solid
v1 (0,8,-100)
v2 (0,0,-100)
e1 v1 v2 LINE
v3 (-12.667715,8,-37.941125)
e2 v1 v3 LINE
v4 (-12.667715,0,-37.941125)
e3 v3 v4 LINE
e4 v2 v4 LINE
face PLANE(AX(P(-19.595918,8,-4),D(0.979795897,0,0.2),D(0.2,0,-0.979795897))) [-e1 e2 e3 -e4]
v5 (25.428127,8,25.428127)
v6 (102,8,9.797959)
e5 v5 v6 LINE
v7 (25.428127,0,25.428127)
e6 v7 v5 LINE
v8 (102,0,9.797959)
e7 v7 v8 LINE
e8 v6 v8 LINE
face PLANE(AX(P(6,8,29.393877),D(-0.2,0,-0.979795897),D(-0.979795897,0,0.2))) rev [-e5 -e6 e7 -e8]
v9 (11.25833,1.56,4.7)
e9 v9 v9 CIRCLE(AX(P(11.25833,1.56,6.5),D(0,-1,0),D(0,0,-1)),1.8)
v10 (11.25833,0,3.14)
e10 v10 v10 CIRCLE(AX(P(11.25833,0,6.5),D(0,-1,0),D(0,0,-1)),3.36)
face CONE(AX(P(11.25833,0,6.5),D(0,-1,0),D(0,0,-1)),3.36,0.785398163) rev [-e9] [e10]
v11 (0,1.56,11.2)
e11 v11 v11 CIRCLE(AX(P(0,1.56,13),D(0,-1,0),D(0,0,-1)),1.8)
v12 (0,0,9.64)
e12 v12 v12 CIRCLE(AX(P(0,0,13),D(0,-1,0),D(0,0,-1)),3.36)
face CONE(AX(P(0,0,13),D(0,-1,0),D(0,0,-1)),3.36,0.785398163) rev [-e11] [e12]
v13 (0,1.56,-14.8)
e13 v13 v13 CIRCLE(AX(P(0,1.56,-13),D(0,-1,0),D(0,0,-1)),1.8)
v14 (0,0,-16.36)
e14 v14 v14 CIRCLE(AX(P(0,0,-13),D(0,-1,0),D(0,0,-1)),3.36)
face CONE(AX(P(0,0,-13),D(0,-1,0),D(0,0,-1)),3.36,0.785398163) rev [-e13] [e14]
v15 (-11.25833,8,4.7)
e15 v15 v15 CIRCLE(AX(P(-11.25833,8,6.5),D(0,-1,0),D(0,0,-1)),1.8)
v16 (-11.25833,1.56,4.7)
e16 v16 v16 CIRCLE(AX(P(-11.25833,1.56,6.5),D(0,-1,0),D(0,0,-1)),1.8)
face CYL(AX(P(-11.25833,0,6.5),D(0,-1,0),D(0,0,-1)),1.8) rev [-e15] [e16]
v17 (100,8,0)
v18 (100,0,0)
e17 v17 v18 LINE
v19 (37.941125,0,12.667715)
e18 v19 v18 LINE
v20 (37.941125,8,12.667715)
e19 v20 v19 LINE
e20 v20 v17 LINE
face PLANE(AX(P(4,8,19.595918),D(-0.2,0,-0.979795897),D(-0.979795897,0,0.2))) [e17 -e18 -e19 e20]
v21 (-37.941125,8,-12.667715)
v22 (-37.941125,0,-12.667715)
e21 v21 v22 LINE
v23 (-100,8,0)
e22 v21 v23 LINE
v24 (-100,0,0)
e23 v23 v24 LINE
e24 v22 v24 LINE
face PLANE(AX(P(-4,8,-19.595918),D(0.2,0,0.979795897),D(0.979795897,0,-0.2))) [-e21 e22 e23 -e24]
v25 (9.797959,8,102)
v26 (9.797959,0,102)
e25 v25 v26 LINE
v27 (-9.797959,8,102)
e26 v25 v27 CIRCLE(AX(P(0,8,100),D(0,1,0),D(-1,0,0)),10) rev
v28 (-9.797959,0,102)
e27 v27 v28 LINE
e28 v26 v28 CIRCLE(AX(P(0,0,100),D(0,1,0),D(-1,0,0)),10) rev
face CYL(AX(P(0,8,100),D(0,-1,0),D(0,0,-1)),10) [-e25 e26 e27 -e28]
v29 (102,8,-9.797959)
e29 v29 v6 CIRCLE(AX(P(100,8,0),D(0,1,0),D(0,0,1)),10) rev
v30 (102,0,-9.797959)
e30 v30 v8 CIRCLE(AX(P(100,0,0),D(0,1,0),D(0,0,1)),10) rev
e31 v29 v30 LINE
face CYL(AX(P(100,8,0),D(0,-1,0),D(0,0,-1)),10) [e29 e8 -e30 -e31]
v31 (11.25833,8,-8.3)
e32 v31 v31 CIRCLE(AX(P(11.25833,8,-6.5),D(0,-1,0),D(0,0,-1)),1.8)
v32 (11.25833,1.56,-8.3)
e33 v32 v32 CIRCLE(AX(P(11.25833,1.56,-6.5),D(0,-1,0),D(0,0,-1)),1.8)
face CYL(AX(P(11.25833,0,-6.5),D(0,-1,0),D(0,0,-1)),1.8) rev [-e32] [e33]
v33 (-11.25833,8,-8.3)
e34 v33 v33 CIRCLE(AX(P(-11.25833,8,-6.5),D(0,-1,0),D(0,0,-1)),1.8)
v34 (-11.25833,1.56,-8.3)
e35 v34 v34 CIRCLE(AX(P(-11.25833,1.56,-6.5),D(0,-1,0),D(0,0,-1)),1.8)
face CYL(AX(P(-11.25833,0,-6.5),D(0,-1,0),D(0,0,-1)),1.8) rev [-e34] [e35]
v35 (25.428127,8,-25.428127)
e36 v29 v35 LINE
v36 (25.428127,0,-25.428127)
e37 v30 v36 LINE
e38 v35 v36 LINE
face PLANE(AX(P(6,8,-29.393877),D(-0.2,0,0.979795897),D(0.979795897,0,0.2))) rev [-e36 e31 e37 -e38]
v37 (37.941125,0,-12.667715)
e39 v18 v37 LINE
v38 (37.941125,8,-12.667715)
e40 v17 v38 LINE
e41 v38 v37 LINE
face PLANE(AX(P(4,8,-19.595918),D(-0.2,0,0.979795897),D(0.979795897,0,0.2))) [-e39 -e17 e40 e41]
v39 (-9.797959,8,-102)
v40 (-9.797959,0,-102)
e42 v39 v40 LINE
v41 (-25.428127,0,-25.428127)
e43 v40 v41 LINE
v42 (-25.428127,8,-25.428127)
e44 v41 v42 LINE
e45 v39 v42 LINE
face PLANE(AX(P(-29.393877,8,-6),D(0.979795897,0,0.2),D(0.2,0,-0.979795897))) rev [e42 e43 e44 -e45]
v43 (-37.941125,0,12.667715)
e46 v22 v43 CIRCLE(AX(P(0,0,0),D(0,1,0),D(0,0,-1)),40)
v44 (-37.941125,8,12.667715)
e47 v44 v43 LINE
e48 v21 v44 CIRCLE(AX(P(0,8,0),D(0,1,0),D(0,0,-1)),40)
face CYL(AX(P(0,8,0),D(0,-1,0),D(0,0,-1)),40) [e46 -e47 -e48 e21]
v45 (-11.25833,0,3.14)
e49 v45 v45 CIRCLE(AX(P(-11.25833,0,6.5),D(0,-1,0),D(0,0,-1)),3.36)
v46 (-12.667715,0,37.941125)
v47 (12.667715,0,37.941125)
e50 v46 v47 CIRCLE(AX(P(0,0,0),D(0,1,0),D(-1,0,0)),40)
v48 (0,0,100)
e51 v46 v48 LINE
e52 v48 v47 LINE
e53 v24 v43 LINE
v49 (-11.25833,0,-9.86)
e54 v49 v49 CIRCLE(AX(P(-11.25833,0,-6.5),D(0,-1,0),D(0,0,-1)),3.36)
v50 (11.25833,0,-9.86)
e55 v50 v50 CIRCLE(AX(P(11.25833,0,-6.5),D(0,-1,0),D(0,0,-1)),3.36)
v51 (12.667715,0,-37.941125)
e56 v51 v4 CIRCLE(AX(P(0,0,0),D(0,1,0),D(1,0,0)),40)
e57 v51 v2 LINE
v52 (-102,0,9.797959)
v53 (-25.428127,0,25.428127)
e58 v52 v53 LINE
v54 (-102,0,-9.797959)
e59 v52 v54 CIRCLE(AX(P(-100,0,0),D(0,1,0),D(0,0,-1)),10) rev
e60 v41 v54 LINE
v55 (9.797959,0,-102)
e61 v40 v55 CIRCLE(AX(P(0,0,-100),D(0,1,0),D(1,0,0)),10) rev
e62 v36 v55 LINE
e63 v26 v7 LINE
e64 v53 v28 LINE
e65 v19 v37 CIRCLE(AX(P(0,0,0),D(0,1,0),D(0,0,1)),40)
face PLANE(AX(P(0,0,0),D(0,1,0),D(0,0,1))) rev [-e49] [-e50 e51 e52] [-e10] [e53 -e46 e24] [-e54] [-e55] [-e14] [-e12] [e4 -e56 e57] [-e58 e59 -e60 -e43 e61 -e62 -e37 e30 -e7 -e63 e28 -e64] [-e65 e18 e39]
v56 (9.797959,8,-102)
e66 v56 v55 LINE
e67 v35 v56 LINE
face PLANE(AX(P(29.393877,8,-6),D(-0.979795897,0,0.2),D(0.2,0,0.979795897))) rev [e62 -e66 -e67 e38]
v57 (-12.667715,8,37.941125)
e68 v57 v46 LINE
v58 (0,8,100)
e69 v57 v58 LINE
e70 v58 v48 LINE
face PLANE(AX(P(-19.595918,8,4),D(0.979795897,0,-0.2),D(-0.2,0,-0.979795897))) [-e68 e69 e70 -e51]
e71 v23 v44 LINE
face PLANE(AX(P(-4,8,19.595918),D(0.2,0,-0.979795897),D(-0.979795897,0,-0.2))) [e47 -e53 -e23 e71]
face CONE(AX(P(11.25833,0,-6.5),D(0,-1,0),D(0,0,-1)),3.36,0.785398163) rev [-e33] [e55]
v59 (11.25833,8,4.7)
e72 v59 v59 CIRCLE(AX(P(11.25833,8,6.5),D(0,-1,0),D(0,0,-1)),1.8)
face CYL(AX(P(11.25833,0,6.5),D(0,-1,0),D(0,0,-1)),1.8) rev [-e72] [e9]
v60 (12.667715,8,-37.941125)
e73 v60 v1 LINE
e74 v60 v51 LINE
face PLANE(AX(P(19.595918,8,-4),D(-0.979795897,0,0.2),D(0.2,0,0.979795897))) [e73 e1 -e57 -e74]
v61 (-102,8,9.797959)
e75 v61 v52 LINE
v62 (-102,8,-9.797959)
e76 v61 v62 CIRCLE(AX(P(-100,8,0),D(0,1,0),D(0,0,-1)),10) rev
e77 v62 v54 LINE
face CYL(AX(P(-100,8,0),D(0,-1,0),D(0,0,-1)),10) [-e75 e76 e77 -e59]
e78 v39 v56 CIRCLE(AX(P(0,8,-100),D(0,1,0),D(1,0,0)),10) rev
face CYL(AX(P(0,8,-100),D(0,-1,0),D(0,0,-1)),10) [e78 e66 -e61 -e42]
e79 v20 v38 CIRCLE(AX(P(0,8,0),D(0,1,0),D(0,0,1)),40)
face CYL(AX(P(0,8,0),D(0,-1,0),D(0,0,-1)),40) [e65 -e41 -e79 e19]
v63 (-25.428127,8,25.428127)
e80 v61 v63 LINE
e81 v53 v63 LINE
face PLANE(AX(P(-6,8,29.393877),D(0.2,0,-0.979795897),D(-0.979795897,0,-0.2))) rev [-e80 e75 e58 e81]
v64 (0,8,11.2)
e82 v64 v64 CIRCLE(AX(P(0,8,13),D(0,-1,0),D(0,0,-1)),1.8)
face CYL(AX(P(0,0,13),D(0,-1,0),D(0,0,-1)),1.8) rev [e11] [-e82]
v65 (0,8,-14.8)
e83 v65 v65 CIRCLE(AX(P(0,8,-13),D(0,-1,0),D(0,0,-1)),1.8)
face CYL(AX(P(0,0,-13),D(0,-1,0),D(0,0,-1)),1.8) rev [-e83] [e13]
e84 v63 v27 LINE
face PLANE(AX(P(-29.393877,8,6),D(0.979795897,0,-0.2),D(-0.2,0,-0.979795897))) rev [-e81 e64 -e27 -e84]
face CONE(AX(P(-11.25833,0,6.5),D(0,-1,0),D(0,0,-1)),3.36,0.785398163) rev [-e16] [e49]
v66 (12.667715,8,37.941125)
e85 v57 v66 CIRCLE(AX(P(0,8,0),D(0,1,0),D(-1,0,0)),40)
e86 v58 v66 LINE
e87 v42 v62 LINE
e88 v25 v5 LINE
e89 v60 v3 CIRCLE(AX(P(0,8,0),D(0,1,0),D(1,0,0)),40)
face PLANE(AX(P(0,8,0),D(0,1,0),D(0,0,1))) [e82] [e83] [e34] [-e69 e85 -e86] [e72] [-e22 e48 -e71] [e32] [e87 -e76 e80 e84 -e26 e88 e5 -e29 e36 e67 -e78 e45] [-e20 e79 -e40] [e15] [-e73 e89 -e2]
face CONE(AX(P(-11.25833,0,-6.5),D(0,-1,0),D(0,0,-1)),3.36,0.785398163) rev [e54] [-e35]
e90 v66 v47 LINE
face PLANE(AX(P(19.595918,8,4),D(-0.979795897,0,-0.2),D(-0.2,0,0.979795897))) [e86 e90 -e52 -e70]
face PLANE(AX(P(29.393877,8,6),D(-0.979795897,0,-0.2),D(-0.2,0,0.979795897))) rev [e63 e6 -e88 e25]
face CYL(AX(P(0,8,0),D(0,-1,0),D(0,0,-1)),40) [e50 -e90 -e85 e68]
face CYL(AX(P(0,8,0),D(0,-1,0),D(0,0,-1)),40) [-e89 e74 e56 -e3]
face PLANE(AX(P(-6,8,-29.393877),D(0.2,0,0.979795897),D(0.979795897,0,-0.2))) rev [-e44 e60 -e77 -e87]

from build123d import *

# Parameters (mm, degrees)
BOSS_EXTRUDE1_DEPTH = 8
CIRPATTERN1_COUNT   = 4


# Read off the part's stored shape, not the designer's step: CSK for M3 Hex Socket Countersunk Cap Screw1
with BuildPart() as part:
    # Sketch2 → Boss-Extrude1 (new body)
    with BuildSketch(Plane(origin=(0, 0, 0), x_dir=(1, 0, 0), z_dir=(0, 1, 0))):
        with BuildLine():
            Line((6, -29.393876913), (102, -9.797958971))
            ThreePointArc((102, -9.797958971), (110, 0), (102, 9.797958971))
            Line((102, 9.797958971), (6, 29.393876913))
            ThreePointArc((6, 29.393876913), (-30, 0), (6, -29.393876913))
        make_face()
        with BuildLine():
            Line((37.941125497, -12.667714712), (100, 0))
            Line((100, 0), (37.941125497, 12.667714712))
            ThreePointArc((37.941125497, 12.667714712), (40, 0), (37.941125497, -12.667714712))
        make_face(mode=Mode.SUBTRACT)
    boss_extrude1 = extrude(amount=BOSS_EXTRUDE1_DEPTH)

    # CirPattern1: Boss-Extrude1 ×4 about axis
    cirpattern1_axis = Axis((0, 0, 0), (0, 1, 0))
    for i in range(1, CIRPATTERN1_COUNT):
        add(boss_extrude1.rotate(cirpattern1_axis, i * 360 / CIRPATTERN1_COUNT))

    # CSK for M3 Hex Socket Countersunk Ca 2 → CSK for M3 Hex Socket Countersunk Cap Screw1 (revolve, cut)
    with BuildSketch(Plane(origin=(-11.258330249, 0, -6.5), x_dir=(1, 0, 0), z_dir=(0, 0, 1))):
        Polygon((1.8, 1.56), (1.8, 8), (0, 8), (0, 0), (3.36, 0), align=None)
    revolve(axis=Axis((-11.258330249, 0, -6.5), (0, 1, 0)), mode=Mode.SUBTRACT)

    # CSK for M3 Hex Socket Countersunk Ca 3 o → CSK for M3 Hex Socket Countersunk Ca 3 (revolve, cut)
    with BuildSketch(Plane(origin=(-11.258330249, 0, 6.5), x_dir=(1, 0, 0), z_dir=(0, 0, 1))):
        Polygon((1.8, 1.56), (1.8, 8), (0, 8), (0, 0), (3.36, 0), align=None)
    revolve(axis=Axis((-11.258330249, 0, 6.5), (0, 1, 0)), mode=Mode.SUBTRACT)

    # CSK for M3 Hex Socket Countersunk Ca 4 o → CSK for M3 Hex Socket Countersunk Ca 4 (revolve, cut)
    with BuildSketch(Plane.XY.offset(13)):
        Polygon((1.8, 1.56), (1.8, 8), (0, 8), (0, 0), (3.36, 0), align=None)
    revolve(axis=Axis((0, 0, 13), (0, 1, 0)), mode=Mode.SUBTRACT)

    # CSK for M3 Hex Socket Countersunk Ca 5 o → CSK for M3 Hex Socket Countersunk Ca 5 (revolve, cut)
    with BuildSketch(Plane(origin=(11.258330249, 0, 6.5), x_dir=(1, 0, 0), z_dir=(0, 0, 1))):
        Polygon((1.8, 1.56), (1.8, 8), (0, 8), (0, 0), (3.36, 0), align=None)
    revolve(axis=Axis((11.258330249, 0, 6.5), (0, 1, 0)), mode=Mode.SUBTRACT)

    # CSK for M3 Hex Socket Countersunk Ca 6 o → CSK for M3 Hex Socket Countersunk Ca 6 (revolve, cut)
    with BuildSketch(Plane(origin=(11.258330249, 0, -6.5), x_dir=(1, 0, 0), z_dir=(0, 0, 1))):
        Polygon((1.8, 1.56), (1.8, 8), (0, 8), (0, 0), (3.36, 0), align=None)
    revolve(axis=Axis((11.258330249, 0, -6.5), (0, 1, 0)), mode=Mode.SUBTRACT)

    # CSK for M3 Hex Socket Countersunk Ca 7 o → CSK for M3 Hex Socket Countersunk Ca 7 (revolve, cut)
    with BuildSketch(Plane.XY.offset(-13)):
        Polygon((1.8, 1.56), (1.8, 8), (0, 8), (0, 0), (3.36, 0), align=None)
    revolve(axis=Axis((0, 0, -13), (0, 1, 0)), mode=Mode.SUBTRACT)


solid = part.part
